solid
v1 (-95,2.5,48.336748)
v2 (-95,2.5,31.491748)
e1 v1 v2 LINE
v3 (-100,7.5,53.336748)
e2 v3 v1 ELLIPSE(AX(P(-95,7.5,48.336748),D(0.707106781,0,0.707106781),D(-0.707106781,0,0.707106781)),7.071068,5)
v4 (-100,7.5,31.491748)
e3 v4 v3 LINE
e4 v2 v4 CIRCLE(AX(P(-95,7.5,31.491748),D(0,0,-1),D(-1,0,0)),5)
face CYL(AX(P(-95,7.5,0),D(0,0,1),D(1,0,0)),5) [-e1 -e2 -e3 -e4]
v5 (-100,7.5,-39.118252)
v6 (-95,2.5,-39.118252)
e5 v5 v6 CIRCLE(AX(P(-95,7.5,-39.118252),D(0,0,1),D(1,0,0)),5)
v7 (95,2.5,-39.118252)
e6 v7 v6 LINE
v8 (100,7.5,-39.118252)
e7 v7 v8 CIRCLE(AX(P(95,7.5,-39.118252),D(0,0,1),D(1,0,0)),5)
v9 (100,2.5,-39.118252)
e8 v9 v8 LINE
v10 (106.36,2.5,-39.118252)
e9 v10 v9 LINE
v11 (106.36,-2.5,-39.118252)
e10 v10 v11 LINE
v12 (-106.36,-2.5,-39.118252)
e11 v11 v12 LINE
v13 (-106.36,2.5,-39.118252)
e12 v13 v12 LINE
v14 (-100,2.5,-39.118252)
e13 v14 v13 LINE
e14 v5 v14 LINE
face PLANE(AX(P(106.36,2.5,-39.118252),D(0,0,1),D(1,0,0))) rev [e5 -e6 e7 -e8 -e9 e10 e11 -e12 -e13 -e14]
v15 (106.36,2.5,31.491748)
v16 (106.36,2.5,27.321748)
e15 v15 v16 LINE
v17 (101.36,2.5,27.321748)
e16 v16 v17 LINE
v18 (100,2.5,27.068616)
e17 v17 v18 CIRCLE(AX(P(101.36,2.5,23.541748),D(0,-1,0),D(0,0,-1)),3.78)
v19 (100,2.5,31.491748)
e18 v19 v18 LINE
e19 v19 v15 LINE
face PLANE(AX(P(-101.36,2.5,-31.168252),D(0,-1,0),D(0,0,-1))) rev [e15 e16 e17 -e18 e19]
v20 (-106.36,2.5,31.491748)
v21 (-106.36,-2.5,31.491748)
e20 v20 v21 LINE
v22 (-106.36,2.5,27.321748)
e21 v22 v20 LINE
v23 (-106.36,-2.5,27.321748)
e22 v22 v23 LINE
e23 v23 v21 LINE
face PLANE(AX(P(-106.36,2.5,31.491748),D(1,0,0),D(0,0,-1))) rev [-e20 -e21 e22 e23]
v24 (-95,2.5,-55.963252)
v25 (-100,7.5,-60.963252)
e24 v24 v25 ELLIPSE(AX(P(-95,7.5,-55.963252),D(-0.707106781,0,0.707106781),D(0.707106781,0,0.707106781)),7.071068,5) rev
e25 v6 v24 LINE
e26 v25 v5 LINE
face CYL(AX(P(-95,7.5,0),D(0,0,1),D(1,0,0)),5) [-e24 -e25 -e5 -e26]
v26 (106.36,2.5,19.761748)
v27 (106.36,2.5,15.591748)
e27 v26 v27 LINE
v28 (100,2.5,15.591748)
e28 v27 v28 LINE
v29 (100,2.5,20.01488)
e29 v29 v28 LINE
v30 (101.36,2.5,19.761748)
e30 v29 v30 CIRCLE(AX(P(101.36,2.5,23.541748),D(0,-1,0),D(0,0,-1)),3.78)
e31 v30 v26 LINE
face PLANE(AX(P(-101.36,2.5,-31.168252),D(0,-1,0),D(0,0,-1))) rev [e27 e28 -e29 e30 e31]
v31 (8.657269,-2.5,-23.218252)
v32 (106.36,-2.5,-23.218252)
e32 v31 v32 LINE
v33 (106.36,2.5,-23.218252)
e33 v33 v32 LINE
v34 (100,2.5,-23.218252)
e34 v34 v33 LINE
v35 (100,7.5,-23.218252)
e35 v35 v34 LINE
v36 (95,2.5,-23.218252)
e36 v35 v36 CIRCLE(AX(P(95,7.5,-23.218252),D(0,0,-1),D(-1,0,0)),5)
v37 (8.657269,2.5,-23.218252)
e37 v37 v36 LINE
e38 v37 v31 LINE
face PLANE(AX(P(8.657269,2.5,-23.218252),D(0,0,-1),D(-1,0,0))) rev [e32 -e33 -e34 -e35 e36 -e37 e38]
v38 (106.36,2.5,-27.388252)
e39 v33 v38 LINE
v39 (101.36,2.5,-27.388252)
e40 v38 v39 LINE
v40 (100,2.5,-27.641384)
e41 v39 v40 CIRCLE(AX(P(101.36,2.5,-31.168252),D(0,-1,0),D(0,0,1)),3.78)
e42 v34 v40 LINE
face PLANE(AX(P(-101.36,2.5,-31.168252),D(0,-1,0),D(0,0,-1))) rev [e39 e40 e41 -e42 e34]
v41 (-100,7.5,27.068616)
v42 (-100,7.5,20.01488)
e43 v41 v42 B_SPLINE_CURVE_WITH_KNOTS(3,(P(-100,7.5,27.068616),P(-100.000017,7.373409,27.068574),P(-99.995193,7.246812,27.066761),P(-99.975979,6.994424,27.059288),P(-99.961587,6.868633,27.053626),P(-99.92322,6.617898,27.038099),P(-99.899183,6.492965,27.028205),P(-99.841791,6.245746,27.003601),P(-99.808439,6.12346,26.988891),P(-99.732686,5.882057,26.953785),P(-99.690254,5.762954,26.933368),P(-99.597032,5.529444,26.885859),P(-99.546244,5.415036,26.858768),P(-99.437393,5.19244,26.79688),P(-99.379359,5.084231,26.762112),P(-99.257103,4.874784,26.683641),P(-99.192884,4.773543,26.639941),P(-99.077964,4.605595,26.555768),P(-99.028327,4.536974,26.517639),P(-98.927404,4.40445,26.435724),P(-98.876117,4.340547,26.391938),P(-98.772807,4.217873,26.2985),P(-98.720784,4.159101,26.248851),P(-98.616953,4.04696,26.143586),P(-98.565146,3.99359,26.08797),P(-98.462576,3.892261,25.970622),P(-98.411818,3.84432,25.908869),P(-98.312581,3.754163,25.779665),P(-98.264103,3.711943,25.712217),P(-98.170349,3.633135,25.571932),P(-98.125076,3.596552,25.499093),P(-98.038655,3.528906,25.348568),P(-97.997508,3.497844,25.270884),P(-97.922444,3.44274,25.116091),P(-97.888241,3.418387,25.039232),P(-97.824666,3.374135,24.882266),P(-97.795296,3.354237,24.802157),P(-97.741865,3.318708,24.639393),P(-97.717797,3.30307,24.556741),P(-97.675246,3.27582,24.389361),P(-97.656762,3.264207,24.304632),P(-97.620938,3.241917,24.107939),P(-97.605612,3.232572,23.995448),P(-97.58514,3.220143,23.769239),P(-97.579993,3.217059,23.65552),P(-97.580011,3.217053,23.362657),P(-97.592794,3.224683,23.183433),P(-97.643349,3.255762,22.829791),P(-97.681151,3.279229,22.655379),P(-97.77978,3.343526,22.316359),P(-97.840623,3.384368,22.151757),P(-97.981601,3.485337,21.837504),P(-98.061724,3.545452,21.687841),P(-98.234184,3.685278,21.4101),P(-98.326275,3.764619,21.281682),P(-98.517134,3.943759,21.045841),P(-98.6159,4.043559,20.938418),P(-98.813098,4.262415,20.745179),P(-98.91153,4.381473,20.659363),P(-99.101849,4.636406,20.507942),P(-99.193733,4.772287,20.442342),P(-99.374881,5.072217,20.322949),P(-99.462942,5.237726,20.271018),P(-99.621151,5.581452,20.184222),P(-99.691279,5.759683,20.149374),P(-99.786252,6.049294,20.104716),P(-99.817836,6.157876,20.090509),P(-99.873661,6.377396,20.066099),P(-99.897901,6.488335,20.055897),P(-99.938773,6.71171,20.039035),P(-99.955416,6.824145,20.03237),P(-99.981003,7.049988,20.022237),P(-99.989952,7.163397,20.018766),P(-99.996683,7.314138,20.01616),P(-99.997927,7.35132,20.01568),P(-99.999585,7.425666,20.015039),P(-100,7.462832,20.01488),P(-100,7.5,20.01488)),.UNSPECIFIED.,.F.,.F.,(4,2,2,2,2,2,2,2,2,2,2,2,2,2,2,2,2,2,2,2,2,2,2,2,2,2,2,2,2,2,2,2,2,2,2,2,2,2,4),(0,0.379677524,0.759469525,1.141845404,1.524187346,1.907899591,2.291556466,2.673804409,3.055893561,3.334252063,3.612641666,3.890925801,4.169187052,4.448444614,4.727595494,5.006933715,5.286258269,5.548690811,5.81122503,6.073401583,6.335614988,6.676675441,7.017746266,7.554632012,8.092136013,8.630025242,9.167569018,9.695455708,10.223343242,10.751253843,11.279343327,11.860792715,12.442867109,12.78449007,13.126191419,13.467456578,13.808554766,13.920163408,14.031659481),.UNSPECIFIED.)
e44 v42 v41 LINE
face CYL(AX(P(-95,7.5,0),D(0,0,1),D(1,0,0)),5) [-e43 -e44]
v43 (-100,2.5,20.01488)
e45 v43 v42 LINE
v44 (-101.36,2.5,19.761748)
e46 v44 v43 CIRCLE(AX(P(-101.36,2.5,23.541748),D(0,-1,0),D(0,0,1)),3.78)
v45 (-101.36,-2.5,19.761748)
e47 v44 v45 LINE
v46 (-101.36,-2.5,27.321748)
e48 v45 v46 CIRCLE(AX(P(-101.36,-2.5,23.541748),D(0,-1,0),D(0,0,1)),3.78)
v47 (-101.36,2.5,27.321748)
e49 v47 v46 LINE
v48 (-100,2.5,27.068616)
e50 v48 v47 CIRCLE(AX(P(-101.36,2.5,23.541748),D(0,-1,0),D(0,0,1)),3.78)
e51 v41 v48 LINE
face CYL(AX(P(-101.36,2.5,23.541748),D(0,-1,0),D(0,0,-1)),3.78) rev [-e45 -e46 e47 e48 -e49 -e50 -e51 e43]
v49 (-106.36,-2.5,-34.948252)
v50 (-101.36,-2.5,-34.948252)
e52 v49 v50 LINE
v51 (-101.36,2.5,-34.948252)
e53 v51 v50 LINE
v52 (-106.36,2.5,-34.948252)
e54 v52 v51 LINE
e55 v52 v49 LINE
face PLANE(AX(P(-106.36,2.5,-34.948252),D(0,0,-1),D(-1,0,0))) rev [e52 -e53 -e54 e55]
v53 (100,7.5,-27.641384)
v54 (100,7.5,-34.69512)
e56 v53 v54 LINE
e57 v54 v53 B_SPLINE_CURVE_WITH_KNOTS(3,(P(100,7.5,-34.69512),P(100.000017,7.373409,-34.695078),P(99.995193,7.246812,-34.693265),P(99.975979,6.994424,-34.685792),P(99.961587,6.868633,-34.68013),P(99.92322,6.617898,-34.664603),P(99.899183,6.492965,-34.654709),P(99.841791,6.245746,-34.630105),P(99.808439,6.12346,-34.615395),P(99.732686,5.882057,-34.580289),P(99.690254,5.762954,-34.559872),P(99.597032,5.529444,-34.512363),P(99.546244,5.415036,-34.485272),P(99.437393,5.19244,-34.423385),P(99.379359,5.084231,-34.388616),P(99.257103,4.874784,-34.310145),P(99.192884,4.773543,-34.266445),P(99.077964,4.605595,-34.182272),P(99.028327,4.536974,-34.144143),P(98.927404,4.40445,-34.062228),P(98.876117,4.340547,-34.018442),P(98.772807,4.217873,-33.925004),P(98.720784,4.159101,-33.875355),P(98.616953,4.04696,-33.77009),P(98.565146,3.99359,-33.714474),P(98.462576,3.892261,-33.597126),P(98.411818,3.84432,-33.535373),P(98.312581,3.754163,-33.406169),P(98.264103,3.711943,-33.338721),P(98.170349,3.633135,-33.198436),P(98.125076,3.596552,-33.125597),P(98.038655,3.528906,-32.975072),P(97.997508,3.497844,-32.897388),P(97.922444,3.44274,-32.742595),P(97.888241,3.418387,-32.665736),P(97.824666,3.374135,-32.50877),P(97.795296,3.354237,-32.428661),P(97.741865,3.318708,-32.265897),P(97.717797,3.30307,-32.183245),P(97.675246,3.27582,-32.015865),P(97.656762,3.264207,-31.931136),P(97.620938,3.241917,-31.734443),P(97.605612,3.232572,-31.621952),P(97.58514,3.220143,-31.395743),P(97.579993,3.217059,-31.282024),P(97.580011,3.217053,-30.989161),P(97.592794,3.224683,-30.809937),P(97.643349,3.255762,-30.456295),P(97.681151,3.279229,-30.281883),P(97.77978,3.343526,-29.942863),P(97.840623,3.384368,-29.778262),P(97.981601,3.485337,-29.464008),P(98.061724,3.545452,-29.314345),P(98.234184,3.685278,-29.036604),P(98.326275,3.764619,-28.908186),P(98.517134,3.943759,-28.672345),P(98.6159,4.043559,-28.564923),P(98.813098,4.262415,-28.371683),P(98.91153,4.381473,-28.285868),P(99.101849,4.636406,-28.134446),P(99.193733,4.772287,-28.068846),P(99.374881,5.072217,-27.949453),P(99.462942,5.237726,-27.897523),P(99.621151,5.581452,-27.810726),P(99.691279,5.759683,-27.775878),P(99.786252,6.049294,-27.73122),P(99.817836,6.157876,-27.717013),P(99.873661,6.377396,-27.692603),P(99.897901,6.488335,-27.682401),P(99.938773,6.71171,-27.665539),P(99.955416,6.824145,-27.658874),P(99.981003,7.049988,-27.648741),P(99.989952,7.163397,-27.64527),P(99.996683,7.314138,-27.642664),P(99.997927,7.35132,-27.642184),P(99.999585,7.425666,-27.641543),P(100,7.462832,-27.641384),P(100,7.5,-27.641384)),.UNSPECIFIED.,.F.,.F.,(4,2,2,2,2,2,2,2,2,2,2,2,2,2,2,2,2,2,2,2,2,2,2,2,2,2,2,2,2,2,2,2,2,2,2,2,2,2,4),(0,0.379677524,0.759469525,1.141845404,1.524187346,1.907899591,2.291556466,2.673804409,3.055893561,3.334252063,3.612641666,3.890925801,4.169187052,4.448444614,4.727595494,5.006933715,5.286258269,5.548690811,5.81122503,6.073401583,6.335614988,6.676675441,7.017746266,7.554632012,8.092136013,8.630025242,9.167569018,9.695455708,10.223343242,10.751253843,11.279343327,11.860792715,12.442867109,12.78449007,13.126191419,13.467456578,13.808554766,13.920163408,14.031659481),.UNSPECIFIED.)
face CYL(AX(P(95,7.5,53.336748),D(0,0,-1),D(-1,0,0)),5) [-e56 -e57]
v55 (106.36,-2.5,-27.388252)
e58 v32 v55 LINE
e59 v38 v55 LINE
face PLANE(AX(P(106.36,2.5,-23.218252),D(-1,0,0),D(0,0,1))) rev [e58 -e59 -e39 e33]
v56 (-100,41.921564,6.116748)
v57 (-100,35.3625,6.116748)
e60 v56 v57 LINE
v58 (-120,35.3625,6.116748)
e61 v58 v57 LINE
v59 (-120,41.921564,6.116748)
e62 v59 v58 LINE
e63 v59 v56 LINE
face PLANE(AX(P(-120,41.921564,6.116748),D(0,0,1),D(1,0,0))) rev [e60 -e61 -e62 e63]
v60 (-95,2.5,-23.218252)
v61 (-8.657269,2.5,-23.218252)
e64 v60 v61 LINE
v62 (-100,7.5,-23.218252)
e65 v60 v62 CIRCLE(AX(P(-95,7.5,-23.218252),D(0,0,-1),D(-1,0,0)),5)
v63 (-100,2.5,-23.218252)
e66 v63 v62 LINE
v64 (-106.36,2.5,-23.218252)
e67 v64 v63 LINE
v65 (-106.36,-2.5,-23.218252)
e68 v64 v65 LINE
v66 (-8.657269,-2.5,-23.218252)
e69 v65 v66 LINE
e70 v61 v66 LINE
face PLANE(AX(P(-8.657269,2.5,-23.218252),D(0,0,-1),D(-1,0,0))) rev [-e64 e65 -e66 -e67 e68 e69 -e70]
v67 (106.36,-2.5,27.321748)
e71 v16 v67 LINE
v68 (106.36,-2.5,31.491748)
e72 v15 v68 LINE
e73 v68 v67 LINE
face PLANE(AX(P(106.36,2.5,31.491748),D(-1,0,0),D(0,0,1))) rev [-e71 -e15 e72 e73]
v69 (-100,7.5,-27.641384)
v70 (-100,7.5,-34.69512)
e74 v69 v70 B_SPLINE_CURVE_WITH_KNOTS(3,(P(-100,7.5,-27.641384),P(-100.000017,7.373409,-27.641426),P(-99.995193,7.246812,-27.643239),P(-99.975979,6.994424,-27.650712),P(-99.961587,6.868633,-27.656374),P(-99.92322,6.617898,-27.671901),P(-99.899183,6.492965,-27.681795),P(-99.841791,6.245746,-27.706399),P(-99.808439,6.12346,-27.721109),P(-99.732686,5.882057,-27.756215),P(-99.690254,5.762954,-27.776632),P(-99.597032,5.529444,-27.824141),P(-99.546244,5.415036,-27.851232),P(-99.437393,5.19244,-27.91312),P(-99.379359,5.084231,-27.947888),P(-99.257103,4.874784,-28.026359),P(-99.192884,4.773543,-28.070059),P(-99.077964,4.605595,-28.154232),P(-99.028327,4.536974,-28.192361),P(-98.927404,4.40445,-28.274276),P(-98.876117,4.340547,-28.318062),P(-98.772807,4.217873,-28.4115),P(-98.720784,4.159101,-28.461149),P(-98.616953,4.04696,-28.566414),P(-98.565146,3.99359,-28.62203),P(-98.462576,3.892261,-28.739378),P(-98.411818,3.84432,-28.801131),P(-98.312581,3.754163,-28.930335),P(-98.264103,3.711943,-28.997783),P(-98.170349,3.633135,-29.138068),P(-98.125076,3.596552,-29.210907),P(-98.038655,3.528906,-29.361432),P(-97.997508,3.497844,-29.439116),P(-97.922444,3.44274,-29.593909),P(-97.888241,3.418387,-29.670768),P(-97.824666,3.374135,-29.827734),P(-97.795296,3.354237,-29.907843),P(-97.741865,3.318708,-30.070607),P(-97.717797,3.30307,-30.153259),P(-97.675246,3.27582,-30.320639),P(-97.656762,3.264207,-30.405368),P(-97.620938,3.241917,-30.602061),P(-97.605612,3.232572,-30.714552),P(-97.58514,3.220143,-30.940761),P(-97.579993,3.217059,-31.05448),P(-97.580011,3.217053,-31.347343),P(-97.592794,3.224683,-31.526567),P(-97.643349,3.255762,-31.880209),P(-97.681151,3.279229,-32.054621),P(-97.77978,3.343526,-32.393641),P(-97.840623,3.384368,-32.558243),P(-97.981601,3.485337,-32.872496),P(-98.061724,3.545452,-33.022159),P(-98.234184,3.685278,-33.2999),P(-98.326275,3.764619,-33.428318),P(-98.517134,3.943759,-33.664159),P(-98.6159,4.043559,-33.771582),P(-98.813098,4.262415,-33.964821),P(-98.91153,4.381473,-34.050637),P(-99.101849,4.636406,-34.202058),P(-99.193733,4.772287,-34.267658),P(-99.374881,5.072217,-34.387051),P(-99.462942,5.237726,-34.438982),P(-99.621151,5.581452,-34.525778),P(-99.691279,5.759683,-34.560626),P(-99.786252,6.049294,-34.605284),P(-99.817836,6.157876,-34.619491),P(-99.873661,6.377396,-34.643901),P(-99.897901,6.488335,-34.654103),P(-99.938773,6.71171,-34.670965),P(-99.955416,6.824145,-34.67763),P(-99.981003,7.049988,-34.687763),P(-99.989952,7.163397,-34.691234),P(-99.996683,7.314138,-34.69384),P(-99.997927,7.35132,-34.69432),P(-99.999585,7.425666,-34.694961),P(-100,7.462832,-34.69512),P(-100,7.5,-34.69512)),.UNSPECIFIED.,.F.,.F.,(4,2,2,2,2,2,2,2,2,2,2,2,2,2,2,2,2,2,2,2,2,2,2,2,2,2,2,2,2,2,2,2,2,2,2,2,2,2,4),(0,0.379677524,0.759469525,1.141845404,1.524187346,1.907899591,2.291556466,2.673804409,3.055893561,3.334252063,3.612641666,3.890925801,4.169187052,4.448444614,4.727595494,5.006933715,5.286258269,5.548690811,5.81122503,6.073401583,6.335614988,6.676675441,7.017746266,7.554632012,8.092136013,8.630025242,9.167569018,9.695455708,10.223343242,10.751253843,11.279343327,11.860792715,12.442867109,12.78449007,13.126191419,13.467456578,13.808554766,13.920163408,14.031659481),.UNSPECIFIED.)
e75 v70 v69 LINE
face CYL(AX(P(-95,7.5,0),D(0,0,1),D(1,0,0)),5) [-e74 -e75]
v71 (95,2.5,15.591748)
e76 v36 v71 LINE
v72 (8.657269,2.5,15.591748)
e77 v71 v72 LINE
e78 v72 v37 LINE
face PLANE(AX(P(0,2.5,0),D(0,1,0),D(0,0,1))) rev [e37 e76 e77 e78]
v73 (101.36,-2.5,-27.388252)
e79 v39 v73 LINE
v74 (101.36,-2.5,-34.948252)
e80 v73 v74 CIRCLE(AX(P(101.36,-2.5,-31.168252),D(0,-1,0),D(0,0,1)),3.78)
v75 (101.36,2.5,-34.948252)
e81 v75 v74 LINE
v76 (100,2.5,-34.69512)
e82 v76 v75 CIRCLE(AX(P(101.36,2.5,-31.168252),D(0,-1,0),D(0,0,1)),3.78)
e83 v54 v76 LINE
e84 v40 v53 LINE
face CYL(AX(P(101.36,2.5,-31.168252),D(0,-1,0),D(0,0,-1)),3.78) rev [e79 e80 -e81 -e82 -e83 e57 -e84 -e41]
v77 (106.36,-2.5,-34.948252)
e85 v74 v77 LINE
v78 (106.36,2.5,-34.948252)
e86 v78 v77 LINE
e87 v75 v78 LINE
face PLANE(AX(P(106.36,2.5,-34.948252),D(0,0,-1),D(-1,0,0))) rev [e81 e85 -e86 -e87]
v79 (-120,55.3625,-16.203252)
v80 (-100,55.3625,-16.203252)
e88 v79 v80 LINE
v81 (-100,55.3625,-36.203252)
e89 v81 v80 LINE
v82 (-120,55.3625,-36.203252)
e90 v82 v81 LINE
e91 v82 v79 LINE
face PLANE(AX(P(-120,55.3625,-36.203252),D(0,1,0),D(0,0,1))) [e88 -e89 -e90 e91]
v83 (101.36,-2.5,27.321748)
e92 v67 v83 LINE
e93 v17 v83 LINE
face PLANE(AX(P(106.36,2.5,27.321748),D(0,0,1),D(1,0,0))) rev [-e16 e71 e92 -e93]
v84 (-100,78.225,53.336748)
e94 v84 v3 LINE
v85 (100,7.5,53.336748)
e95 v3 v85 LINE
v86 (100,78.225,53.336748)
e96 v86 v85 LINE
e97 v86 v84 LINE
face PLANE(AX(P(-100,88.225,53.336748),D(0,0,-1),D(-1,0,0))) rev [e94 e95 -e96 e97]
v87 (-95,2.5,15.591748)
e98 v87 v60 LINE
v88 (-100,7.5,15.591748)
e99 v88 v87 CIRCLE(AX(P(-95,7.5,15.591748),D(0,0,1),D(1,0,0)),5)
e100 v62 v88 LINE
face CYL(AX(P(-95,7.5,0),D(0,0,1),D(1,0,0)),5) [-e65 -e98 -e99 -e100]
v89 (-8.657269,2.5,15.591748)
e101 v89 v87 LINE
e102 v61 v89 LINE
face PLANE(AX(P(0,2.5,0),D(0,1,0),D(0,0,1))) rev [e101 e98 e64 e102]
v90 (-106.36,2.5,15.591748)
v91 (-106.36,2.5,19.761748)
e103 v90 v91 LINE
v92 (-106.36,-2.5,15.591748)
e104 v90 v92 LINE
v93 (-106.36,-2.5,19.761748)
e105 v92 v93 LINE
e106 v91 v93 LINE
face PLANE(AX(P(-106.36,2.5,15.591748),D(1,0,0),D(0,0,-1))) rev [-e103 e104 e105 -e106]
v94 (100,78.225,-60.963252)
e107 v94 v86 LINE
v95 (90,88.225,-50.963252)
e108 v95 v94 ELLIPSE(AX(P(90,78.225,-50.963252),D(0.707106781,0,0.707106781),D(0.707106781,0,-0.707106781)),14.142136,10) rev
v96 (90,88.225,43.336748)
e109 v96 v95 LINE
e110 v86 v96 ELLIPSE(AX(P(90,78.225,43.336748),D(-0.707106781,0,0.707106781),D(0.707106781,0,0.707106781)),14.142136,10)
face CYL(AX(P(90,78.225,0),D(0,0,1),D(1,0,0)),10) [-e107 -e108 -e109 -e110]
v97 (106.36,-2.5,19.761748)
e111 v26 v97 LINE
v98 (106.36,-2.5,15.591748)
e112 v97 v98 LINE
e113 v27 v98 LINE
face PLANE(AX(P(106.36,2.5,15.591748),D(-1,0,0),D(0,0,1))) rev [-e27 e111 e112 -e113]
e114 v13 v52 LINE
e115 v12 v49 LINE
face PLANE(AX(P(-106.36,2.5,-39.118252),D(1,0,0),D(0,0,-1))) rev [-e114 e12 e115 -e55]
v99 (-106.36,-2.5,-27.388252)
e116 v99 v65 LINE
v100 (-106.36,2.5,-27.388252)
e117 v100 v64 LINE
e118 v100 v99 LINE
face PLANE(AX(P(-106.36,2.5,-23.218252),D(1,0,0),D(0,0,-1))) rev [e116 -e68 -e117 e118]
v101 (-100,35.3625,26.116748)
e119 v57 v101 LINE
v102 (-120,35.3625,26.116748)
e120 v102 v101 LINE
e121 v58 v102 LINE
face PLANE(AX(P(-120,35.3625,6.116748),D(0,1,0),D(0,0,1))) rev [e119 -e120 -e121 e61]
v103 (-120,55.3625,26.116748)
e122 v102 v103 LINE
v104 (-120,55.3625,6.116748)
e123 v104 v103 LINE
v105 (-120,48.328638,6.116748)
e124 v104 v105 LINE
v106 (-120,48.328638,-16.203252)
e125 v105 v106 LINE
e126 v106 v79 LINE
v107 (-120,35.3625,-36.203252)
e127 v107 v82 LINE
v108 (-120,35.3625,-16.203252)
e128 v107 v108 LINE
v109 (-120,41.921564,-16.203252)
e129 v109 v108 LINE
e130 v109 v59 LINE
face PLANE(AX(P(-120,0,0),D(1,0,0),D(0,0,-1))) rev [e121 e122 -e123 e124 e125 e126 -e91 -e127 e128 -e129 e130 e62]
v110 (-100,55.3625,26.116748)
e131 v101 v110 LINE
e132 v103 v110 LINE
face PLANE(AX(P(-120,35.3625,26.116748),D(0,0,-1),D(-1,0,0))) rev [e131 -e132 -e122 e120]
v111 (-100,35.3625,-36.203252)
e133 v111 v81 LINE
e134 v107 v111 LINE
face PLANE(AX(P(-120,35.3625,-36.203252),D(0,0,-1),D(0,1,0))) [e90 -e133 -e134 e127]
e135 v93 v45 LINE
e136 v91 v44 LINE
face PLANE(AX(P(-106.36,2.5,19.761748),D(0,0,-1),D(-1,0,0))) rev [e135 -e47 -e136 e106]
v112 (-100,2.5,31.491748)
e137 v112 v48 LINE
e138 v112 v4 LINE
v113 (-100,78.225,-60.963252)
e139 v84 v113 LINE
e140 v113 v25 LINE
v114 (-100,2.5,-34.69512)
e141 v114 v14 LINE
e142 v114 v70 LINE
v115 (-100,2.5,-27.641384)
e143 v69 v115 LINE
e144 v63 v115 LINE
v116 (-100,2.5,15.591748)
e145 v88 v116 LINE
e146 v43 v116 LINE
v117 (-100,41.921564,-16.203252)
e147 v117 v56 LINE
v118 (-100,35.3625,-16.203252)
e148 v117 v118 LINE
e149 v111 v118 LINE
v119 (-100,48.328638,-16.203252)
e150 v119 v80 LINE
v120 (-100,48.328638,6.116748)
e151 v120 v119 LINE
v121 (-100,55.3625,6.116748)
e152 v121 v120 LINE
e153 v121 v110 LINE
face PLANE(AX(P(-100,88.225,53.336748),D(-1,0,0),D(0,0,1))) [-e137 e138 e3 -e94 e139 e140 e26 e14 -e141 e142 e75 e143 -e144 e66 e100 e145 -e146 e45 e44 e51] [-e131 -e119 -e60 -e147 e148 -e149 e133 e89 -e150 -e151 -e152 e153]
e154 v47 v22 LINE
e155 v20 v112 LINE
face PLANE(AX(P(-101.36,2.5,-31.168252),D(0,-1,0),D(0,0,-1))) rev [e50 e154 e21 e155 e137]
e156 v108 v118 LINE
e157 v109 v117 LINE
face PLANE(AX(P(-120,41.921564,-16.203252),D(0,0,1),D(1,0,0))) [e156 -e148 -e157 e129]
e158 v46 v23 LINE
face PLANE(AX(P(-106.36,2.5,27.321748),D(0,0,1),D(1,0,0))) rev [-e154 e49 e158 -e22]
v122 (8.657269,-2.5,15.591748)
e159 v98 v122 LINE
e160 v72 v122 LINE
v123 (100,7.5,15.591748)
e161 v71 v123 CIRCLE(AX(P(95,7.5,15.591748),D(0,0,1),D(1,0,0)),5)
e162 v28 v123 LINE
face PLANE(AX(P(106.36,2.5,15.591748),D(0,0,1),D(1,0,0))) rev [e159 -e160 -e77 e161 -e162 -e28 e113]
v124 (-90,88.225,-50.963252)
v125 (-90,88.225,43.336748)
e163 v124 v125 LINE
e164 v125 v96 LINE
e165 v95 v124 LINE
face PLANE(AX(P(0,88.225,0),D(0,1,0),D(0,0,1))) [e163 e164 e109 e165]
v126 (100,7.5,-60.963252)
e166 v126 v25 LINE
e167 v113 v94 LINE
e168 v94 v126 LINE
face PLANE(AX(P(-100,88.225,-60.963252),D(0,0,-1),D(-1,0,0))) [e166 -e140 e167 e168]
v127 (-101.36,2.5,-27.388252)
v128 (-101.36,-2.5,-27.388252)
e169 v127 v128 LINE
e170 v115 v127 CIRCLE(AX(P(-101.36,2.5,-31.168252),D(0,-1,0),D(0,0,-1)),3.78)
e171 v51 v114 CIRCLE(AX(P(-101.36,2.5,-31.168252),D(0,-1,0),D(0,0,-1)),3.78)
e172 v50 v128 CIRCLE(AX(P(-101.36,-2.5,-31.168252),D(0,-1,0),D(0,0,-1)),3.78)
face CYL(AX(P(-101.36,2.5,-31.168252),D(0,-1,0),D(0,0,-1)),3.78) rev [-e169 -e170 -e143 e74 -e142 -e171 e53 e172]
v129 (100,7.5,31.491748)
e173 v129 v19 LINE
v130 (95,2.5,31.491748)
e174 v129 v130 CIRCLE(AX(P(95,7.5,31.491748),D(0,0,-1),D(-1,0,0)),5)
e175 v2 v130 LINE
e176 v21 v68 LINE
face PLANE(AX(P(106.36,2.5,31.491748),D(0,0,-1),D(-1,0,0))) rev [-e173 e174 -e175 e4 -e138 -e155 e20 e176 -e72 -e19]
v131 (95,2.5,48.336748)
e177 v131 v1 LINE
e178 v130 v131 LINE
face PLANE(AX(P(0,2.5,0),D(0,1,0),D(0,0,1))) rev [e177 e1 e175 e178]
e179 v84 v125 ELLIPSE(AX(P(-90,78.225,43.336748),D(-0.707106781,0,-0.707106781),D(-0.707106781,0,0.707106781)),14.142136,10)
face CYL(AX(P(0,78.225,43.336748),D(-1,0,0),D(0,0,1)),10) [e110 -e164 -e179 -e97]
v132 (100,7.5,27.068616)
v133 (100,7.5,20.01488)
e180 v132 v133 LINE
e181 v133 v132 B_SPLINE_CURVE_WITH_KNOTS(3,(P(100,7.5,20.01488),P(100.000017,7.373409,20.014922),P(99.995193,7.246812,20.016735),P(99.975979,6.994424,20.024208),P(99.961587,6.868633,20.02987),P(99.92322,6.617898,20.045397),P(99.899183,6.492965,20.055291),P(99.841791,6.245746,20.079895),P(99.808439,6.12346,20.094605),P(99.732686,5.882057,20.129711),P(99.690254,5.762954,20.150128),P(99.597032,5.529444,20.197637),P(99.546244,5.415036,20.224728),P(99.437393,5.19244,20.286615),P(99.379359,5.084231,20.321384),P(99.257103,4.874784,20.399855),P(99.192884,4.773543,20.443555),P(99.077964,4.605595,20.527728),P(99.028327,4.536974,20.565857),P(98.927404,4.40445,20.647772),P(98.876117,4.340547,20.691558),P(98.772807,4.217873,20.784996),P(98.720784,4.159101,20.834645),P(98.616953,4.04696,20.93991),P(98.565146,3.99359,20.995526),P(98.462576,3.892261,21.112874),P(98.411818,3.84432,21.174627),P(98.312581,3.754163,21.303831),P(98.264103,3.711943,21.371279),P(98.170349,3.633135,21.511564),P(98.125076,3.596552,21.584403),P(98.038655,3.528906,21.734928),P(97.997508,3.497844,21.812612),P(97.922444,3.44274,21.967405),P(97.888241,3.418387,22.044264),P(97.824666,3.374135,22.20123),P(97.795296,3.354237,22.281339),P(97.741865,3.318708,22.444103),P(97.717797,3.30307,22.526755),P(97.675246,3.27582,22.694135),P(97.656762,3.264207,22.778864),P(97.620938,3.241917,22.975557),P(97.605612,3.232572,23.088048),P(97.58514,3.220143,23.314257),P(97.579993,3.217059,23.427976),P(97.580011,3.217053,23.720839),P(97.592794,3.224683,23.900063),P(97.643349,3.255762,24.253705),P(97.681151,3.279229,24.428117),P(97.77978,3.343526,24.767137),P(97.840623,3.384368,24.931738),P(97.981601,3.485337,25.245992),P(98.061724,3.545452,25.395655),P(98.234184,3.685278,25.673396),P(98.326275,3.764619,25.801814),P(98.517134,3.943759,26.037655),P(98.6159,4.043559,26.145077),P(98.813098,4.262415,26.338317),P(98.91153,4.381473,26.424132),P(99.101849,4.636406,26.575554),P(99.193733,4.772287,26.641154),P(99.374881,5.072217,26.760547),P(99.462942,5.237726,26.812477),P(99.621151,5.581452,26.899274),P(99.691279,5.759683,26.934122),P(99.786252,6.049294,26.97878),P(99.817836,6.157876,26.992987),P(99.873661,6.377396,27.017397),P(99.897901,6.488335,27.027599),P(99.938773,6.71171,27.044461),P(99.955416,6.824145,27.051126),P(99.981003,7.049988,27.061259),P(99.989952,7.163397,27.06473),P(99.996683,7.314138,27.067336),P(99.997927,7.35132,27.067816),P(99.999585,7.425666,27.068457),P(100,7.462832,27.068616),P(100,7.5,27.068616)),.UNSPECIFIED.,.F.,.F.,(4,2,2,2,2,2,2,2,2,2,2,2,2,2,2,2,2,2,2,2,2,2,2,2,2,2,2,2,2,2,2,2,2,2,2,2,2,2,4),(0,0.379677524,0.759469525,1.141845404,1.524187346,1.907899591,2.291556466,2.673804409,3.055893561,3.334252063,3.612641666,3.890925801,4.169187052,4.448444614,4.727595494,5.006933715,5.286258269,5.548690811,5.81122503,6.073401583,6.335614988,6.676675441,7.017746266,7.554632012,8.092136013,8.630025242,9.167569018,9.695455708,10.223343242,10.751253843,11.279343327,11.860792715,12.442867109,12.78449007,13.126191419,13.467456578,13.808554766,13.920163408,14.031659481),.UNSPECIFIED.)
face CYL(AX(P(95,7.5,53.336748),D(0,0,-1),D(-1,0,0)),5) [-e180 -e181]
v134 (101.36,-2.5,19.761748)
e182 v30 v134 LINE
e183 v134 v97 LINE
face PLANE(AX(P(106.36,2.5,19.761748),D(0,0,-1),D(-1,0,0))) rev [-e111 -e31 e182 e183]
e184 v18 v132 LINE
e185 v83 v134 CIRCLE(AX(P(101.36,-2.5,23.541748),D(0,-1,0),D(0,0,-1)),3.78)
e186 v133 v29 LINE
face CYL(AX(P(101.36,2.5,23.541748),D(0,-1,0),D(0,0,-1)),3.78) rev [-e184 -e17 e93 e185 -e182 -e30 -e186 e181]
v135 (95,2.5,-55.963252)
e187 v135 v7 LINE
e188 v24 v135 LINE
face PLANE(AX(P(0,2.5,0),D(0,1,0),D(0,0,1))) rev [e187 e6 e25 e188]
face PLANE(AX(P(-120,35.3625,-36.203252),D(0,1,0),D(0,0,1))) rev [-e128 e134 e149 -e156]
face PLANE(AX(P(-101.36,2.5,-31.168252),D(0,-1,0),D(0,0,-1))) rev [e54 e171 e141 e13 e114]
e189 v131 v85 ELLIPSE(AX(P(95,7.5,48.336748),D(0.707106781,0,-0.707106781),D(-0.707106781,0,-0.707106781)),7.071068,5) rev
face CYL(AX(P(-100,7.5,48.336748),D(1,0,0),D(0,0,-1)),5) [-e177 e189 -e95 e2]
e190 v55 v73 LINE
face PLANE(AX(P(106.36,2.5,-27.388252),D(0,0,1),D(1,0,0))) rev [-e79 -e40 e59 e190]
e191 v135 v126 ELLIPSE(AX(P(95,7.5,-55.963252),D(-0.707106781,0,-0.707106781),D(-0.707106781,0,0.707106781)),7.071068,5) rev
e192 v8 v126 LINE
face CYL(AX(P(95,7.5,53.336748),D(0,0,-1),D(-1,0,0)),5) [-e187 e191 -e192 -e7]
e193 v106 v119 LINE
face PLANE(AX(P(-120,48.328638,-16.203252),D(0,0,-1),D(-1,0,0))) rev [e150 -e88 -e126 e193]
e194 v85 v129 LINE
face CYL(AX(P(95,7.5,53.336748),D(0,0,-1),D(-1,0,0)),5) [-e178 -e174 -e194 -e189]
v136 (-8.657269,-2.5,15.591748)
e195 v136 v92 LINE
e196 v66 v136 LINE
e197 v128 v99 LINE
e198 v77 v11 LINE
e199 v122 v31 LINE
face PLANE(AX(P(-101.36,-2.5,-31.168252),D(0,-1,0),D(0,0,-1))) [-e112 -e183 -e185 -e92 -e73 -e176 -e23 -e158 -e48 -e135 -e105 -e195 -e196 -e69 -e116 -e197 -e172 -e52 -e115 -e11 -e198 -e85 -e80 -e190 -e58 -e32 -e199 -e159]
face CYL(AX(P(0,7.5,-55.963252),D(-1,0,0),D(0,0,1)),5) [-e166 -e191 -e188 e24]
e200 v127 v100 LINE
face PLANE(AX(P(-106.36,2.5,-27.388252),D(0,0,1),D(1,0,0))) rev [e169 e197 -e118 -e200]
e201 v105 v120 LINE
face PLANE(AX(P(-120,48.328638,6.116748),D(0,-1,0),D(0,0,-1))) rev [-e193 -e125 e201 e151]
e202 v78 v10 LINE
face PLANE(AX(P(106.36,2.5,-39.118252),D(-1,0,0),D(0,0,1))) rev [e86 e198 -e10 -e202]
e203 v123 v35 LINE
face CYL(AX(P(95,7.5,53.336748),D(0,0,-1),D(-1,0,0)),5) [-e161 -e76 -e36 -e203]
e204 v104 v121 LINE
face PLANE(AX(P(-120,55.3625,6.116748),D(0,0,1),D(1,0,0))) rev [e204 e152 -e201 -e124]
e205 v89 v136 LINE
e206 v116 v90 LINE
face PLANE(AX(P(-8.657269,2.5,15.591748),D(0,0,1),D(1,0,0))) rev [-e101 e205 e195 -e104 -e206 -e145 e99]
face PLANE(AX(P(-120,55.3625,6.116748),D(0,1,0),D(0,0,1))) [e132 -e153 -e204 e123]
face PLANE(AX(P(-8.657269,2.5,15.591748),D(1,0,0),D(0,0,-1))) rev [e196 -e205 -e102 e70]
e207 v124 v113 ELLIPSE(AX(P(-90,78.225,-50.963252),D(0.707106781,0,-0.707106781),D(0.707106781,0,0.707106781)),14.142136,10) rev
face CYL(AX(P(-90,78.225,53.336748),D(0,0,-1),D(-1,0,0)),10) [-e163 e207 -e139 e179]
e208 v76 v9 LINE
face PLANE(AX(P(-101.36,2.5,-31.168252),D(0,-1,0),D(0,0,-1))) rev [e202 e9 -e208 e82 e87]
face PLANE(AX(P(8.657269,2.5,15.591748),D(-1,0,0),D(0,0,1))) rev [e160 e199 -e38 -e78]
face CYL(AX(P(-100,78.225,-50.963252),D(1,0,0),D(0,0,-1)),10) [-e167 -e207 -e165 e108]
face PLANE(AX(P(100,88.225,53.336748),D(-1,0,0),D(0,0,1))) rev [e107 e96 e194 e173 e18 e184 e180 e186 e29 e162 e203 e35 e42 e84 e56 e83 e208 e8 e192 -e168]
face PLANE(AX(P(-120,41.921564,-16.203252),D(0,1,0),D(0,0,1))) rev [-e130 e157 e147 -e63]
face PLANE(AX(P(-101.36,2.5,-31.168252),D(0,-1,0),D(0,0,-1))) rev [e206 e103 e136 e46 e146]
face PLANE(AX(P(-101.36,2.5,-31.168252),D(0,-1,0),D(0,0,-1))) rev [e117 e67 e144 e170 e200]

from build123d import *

# Parameters (mm, degrees)
BOSS_EXTRUDE1_DEPTH = 2.5
SKETCH2_W           = 200
SKETCH2_H           = 114.3
BOSS_EXTRUDE3_DEPTH = 85.725
BOSS_EXTRUDE5_DEPTH = 20
FILLET1_R           = 5
FILLET2_R           = 10


with BuildPart() as part:
    # Sketch1 → Boss-Extrude1 (new, symmetric)
    with BuildSketch(Plane(origin=(0, 0, 0), x_dir=(1, 0, 0), z_dir=(0, 1, 0))):
        with BuildLine():
            Line((106.36, 39.118252024), (-106.36, 39.118252024))
            Line((-106.36, 39.118252024), (-106.36, 34.948252024))
            Line((-106.36, 34.948252024), (-101.36, 34.948252024))
            ThreePointArc((-101.36, 34.948252024), (-97.58, 31.168252024), (-101.36, 27.388252024))
            Line((-101.36, 27.388252024), (-106.36, 27.388252024))
            Line((-106.36, 27.388252024), (-106.36, 23.218252024))
            Line((-106.36, 23.218252024), (-8.657269076, 23.218252024))
            Line((-8.657269076, 23.218252024), (-8.657269076, -15.591747976))
            Line((-8.657269076, -15.591747976), (-106.36, -15.591747976))
            Line((-106.36, -15.591747976), (-106.36, -19.761747976))
            Line((-106.36, -19.761747976), (-101.36, -19.761747976))
            ThreePointArc((-101.36, -19.761747976), (-97.58, -23.541747976), (-101.36, -27.321747976))
            Line((-101.36, -27.321747976), (-106.36, -27.321747976))
            Line((-106.36, -27.321747976), (-106.36, -31.491747976))
            Line((-106.36, -31.491747976), (106.36, -31.491747976))
            Line((106.36, -31.491747976), (106.36, -27.321747976))
            Line((106.36, -27.321747976), (101.36, -27.321747976))
            ThreePointArc((101.36, -27.321747976), (97.58, -23.541747976), (101.36, -19.761747976))
            Line((101.36, -19.761747976), (106.36, -19.761747976))
            Line((106.36, -19.761747976), (106.36, -15.591747976))
            Line((106.36, -15.591747976), (8.657269076, -15.591747976))
            Line((8.657269076, -15.591747976), (8.657269076, 23.218252024))
            Line((8.657269076, 23.218252024), (106.36, 23.218252024))
            Line((106.36, 23.218252024), (106.36, 27.388252024))
            Line((106.36, 27.388252024), (101.36, 27.388252024))
            ThreePointArc((101.36, 27.388252024), (97.58, 31.168252024), (101.36, 34.948252024))
            Line((101.36, 34.948252024), (106.36, 34.948252024))
            Line((106.36, 34.948252024), (106.36, 39.118252024))
        make_face()
    extrude(amount=BOSS_EXTRUDE1_DEPTH, both=True)

    # Sketch2 → Boss-Extrude3 (add)
    with BuildSketch(Plane(origin=(0, 2.5, 0), x_dir=(1, 0, 0), z_dir=(0, 1, 0))):
        with Locations((0, 3.813252024)):
            Rectangle(SKETCH2_W, SKETCH2_H)
    extrude(amount=BOSS_EXTRUDE3_DEPTH)

    # Sketch3 → Boss-Extrude5 (add)
    with BuildSketch(Plane.ZY.offset(100)):
        Polygon((-16.203252024, 41.921564451), (6.116747976, 41.921564451), (6.116747976, 35.3625), (26.116747976, 35.3625), (26.116747976, 55.3625), (6.116747976, 55.3625), (6.116747976, 48.328638309), (-16.203252024, 48.328638309), (-16.203252024, 55.3625), (-36.203252024, 55.3625), (-36.203252024, 35.3625), (-16.203252024, 35.3625), align=None)
    extrude(amount=BOSS_EXTRUDE5_DEPTH)

    # Fillet1
    # the kernel refuses this fillet: 5 mm, written as the material it takes off along each edge
    with BuildSketch(Plane(origin=(-100, 2.5, 7.514879677), x_dir=(0, 1, 0), z_dir=(0, 0, 1))) as fillet1_piece_1_section:
        with BuildLine():
            CenterArc((FILLET1_R, -FILLET1_R), FILLET1_R, 90, 90)
            Line((0, -FILLET1_R), (0, 0))
            Line((0, 0), (FILLET1_R, 0))
        make_face()
    fillet1_piece_1 = extrude(amount=32.053736598, mode=Mode.PRIVATE)
    fillet1_piece_1 = split(fillet1_piece_1, bisect_by=Plane(origin=(-98.883160305, 3.616839695, 15.591747976), z_dir=(0, 0, -1)), keep=Keep.TOP, mode=Mode.PRIVATE)
    add(fillet1_piece_1, mode=Mode.SUBTRACT)
    with BuildSketch(Plane(origin=(-100, 2.5, 7.514879677), x_dir=(0, 1, 0), z_dir=(0, 0, 1))) as fillet1_piece_2_section:
        with BuildLine():
            CenterArc((FILLET1_R, -FILLET1_R), FILLET1_R, 90, 90)
            Line((0, -FILLET1_R), (0, 0))
            Line((0, 0), (FILLET1_R, 0))
        make_face()
    fillet1_piece_2 = extrude(amount=32.053736598, mode=Mode.PRIVATE)
    fillet1_piece_2 = split(fillet1_piece_2, bisect_by=Plane(origin=(-98.883160305, 3.616839695, 31.491747976), z_dir=(0, 0, 1)), keep=Keep.TOP, mode=Mode.PRIVATE)
    add(fillet1_piece_2, mode=Mode.SUBTRACT)
    with BuildSketch(Plane(origin=(-100, 2.5, 7.514879677), x_dir=(0, 1, 0), z_dir=(0, 0, 1))) as fillet1_piece_3_section:
        with BuildLine():
            CenterArc((FILLET1_R, -FILLET1_R), FILLET1_R, 90, 90)
            Line((0, -FILLET1_R), (0, 0))
            Line((0, 0), (FILLET1_R, 0))
        make_face()
    fillet1_piece_3 = extrude(amount=32.053736598, mode=Mode.PRIVATE)
    fillet1_piece_3 = fillet1_piece_3 & Plane(origin=(-101.36, 3.831804997, 23.541747976), x_dir=(0, 0, -1), z_dir=(0, 1, 0)) * Cylinder(3.78, 85, mode=Mode.PRIVATE)
    add(fillet1_piece_3, mode=Mode.SUBTRACT)
    with BuildSketch(Plane(origin=(-100, 2.5, 31.491747976), x_dir=(0, 1, 0), z_dir=(0, 0, 1)), Plane(origin=(100, 2.5, 65.836747976), x_dir=(0, 1, 0), z_dir=(0, 0, -1))) as fillet1_piece_4:
        with BuildLine():
            CenterArc((FILLET1_R, -FILLET1_R), FILLET1_R, 90, 90)
            Line((0, -FILLET1_R), (0, 0))
            Line((0, 0), (FILLET1_R, 0))
        make_face()
    extrude(amount=34.345, mode=Mode.SUBTRACT)
    with BuildSketch(Plane(origin=(-100, 2.5, 18.991747976), x_dir=(0, 1, 0), z_dir=(0, 0, 1))) as fillet1_piece_5_section:
        with BuildLine():
            CenterArc((FILLET1_R, -FILLET1_R), FILLET1_R, 90, 90)
            Line((0, -FILLET1_R), (0, 0))
            Line((0, 0), (FILLET1_R, 0))
        make_face()
    fillet1_piece_5 = extrude(amount=46.845, mode=Mode.PRIVATE)
    fillet1_piece_5 = fillet1_piece_5 & Plane(origin=(-101.36, 3.831804998, 23.541747976), x_dir=(0, 0, -1), z_dir=(0, 1, 0)) * Cylinder(3.78, 114, mode=Mode.PRIVATE)
    add(fillet1_piece_5, mode=Mode.SUBTRACT)
    with BuildSketch(Plane(origin=(-100, 2.5, -73.463252024), x_dir=(1, 0, 0), z_dir=(0, 0, 1)), Plane(origin=(100, 2.5, -39.118252024), x_dir=(-1, 0, 0), z_dir=(0, 0, -1))) as fillet1_piece_6:
        with BuildLine():
            CenterArc((FILLET1_R, FILLET1_R), FILLET1_R, 180, 90)
            Line((0, FILLET1_R), (0, 0))
            Line((0, 0), (FILLET1_R, 0))
        make_face()
    extrude(amount=34.345, mode=Mode.SUBTRACT)
    with BuildSketch(Plane(origin=(-100, 2.5, -73.463252024), x_dir=(1, 0, 0), z_dir=(0, 0, 1))) as fillet1_piece_7_section:
        with BuildLine():
            CenterArc((FILLET1_R, FILLET1_R), FILLET1_R, 180, 90)
            Line((0, FILLET1_R), (0, 0))
            Line((0, 0), (FILLET1_R, 0))
        make_face()
    fillet1_piece_7 = extrude(amount=46.845, mode=Mode.PRIVATE)
    fillet1_piece_7 = fillet1_piece_7 & Plane(origin=(-101.36, 3.831808232, -31.168252024), x_dir=(0, 0, -1), z_dir=(0, 1, 0)) * Cylinder(3.78, 114, mode=Mode.PRIVATE)
    add(fillet1_piece_7, mode=Mode.SUBTRACT)
    with BuildSketch(Plane(origin=(112.5, 2.5, -60.963252024), x_dir=(0, 0, 1), z_dir=(-1, 0, 0)), Plane(origin=(-112.5, 2.5, 53.336747976), x_dir=(0, 0, -1), z_dir=(1, 0, 0))) as fillet1_piece_8:
        with BuildLine():
            CenterArc((FILLET1_R, FILLET1_R), FILLET1_R, 180, 90)
            Line((0, FILLET1_R), (0, 0))
            Line((0, 0), (FILLET1_R, 0))
        make_face()
    extrude(amount=225, mode=Mode.SUBTRACT)
    with BuildSketch(Plane(origin=(-100, 2.5, -47.195120323), x_dir=(0, 1, 0), z_dir=(0, 0, 1))) as fillet1_piece_9_section:
        with BuildLine():
            CenterArc((FILLET1_R, -FILLET1_R), FILLET1_R, 90, 90)
            Line((0, -FILLET1_R), (0, 0))
            Line((0, 0), (FILLET1_R, 0))
        make_face()
    fillet1_piece_9 = extrude(amount=32.053736598, mode=Mode.PRIVATE)
    fillet1_piece_9 = split(fillet1_piece_9, bisect_by=Plane(origin=(-98.883160305, 3.616839695, -39.118252024), z_dir=(0, 0, -1)), keep=Keep.TOP, mode=Mode.PRIVATE)
    add(fillet1_piece_9, mode=Mode.SUBTRACT)
    with BuildSketch(Plane(origin=(-100, 2.5, -47.195120323), x_dir=(0, 1, 0), z_dir=(0, 0, 1))) as fillet1_piece_10_section:
        with BuildLine():
            CenterArc((FILLET1_R, -FILLET1_R), FILLET1_R, 90, 90)
            Line((0, -FILLET1_R), (0, 0))
            Line((0, 0), (FILLET1_R, 0))
        make_face()
    fillet1_piece_10 = extrude(amount=32.053736598, mode=Mode.PRIVATE)
    fillet1_piece_10 = split(fillet1_piece_10, bisect_by=Plane(origin=(-98.883160305, 3.616839695, -23.218252024), z_dir=(0, 0, 1)), keep=Keep.TOP, mode=Mode.PRIVATE)
    add(fillet1_piece_10, mode=Mode.SUBTRACT)
    with BuildSketch(Plane(origin=(-100, 2.5, -47.195120323), x_dir=(0, 1, 0), z_dir=(0, 0, 1))) as fillet1_piece_11_section:
        with BuildLine():
            CenterArc((FILLET1_R, -FILLET1_R), FILLET1_R, 90, 90)
            Line((0, -FILLET1_R), (0, 0))
            Line((0, 0), (FILLET1_R, 0))
        make_face()
    fillet1_piece_11 = extrude(amount=32.053736598, mode=Mode.PRIVATE)
    fillet1_piece_11 = fillet1_piece_11 & Plane(origin=(-101.36, 3.831804998, -31.168252024), x_dir=(0, 0, -1), z_dir=(0, 1, 0)) * Cylinder(3.78, 85, mode=Mode.PRIVATE)
    add(fillet1_piece_11, mode=Mode.SUBTRACT)
    with BuildSketch(Plane(origin=(-100, 2.5, -23.218252024), x_dir=(0, 1, 0), z_dir=(0, 0, 1)), Plane(origin=(100, 2.5, 15.591747976), x_dir=(0, 1, 0), z_dir=(0, 0, -1))) as fillet1_piece_12:
        with BuildLine():
            CenterArc((FILLET1_R, -FILLET1_R), FILLET1_R, 90, 90)
            Line((0, -FILLET1_R), (0, 0))
            Line((0, 0), (FILLET1_R, 0))
        make_face()
    extrude(amount=38.81, mode=Mode.SUBTRACT)
    with BuildSketch(Plane(origin=(-100, 2.5, -35.718252024), x_dir=(0, 1, 0), z_dir=(0, 0, 1))) as fillet1_piece_13_section:
        with BuildLine():
            CenterArc((FILLET1_R, -FILLET1_R), FILLET1_R, 90, 90)
            Line((0, -FILLET1_R), (0, 0))
            Line((0, 0), (FILLET1_R, 0))
        make_face()
    fillet1_piece_13 = extrude(amount=63.81, mode=Mode.PRIVATE)
    fillet1_piece_13 = fillet1_piece_13 & Plane(origin=(-101.36, 3.831804998, -31.168252024), x_dir=(0, 0, -1), z_dir=(0, 1, 0)) * Cylinder(3.78, 148, mode=Mode.PRIVATE)
    add(fillet1_piece_13, mode=Mode.SUBTRACT)
    with BuildSketch(Plane(origin=(-100, 2.5, -35.718252024), x_dir=(0, 1, 0), z_dir=(0, 0, 1))) as fillet1_piece_14_section:
        with BuildLine():
            CenterArc((FILLET1_R, -FILLET1_R), FILLET1_R, 90, 90)
            Line((0, -FILLET1_R), (0, 0))
            Line((0, 0), (FILLET1_R, 0))
        make_face()
    fillet1_piece_14 = extrude(amount=63.81, mode=Mode.PRIVATE)
    fillet1_piece_14 = fillet1_piece_14 & Plane(origin=(-101.36, 3.831804998, 23.541747976), x_dir=(0, 0, -1), z_dir=(0, 1, 0)) * Cylinder(3.78, 148, mode=Mode.PRIVATE)
    add(fillet1_piece_14, mode=Mode.SUBTRACT)
    with BuildSketch(Plane(origin=(100, 2.5, 65.836747976), x_dir=(0, 1, 0), z_dir=(0, 0, -1))) as fillet1_piece_15_section:
        with BuildLine():
            CenterArc((FILLET1_R, -FILLET1_R), FILLET1_R, 90, 90)
            Line((0, -FILLET1_R), (0, 0))
            Line((0, 0), (FILLET1_R, 0))
        make_face()
    fillet1_piece_15 = extrude(amount=46.845, mode=Mode.PRIVATE)
    fillet1_piece_15 = fillet1_piece_15 & Plane(origin=(101.36, 3.831804997, 23.541747976), x_dir=(0, 0, 1), z_dir=(0, 1, 0)) * Cylinder(3.78, 114, mode=Mode.PRIVATE)
    add(fillet1_piece_15, mode=Mode.SUBTRACT)
    with BuildSketch(Plane(origin=(100, 2.5, 39.568616275), x_dir=(0, 1, 0), z_dir=(0, 0, -1))) as fillet1_piece_16_section:
        with BuildLine():
            CenterArc((FILLET1_R, -FILLET1_R), FILLET1_R, 90, 90)
            Line((0, -FILLET1_R), (0, 0))
            Line((0, 0), (FILLET1_R, 0))
        make_face()
    fillet1_piece_16 = extrude(amount=32.053736598, mode=Mode.PRIVATE)
    fillet1_piece_16 = split(fillet1_piece_16, bisect_by=Plane(origin=(98.883160305, 3.616839695, 31.491747976), z_dir=(0, 0, 1)), keep=Keep.TOP, mode=Mode.PRIVATE)
    add(fillet1_piece_16, mode=Mode.SUBTRACT)
    with BuildSketch(Plane(origin=(100, 2.5, 39.568616275), x_dir=(0, 1, 0), z_dir=(0, 0, -1))) as fillet1_piece_17_section:
        with BuildLine():
            CenterArc((FILLET1_R, -FILLET1_R), FILLET1_R, 90, 90)
            Line((0, -FILLET1_R), (0, 0))
            Line((0, 0), (FILLET1_R, 0))
        make_face()
    fillet1_piece_17 = extrude(amount=32.053736598, mode=Mode.PRIVATE)
    fillet1_piece_17 = split(fillet1_piece_17, bisect_by=Plane(origin=(98.883160305, 3.616839695, 15.591747976), z_dir=(0, 0, -1)), keep=Keep.TOP, mode=Mode.PRIVATE)
    add(fillet1_piece_17, mode=Mode.SUBTRACT)
    with BuildSketch(Plane(origin=(100, 2.5, 39.568616275), x_dir=(0, 1, 0), z_dir=(0, 0, -1))) as fillet1_piece_18_section:
        with BuildLine():
            CenterArc((FILLET1_R, -FILLET1_R), FILLET1_R, 90, 90)
            Line((0, -FILLET1_R), (0, 0))
            Line((0, 0), (FILLET1_R, 0))
        make_face()
    fillet1_piece_18 = extrude(amount=32.053736598, mode=Mode.PRIVATE)
    fillet1_piece_18 = fillet1_piece_18 & Plane(origin=(101.36, 3.831804998, 23.541747976), x_dir=(0, 0, 1), z_dir=(0, 1, 0)) * Cylinder(3.78, 85, mode=Mode.PRIVATE)
    add(fillet1_piece_18, mode=Mode.SUBTRACT)
    with BuildSketch(Plane(origin=(100, 2.5, 28.091747976), x_dir=(0, 1, 0), z_dir=(0, 0, -1))) as fillet1_piece_19_section:
        with BuildLine():
            CenterArc((FILLET1_R, -FILLET1_R), FILLET1_R, 90, 90)
            Line((0, -FILLET1_R), (0, 0))
            Line((0, 0), (FILLET1_R, 0))
        make_face()
    fillet1_piece_19 = extrude(amount=63.81, mode=Mode.PRIVATE)
    fillet1_piece_19 = fillet1_piece_19 & Plane(origin=(101.36, 3.831804998, 23.541747976), x_dir=(0, 0, 1), z_dir=(0, 1, 0)) * Cylinder(3.78, 148, mode=Mode.PRIVATE)
    add(fillet1_piece_19, mode=Mode.SUBTRACT)
    with BuildSketch(Plane(origin=(100, 2.5, 28.091747976), x_dir=(0, 1, 0), z_dir=(0, 0, -1))) as fillet1_piece_20_section:
        with BuildLine():
            CenterArc((FILLET1_R, -FILLET1_R), FILLET1_R, 90, 90)
            Line((0, -FILLET1_R), (0, 0))
            Line((0, 0), (FILLET1_R, 0))
        make_face()
    fillet1_piece_20 = extrude(amount=63.81, mode=Mode.PRIVATE)
    fillet1_piece_20 = fillet1_piece_20 & Plane(origin=(101.36, 3.831804999, -31.168252024), x_dir=(0, 0, 1), z_dir=(0, 1, 0)) * Cylinder(3.78, 148, mode=Mode.PRIVATE)
    add(fillet1_piece_20, mode=Mode.SUBTRACT)
    with BuildSketch(Plane(origin=(100, 2.5, -15.141383725), x_dir=(0, 1, 0), z_dir=(0, 0, -1))) as fillet1_piece_21_section:
        with BuildLine():
            CenterArc((FILLET1_R, -FILLET1_R), FILLET1_R, 90, 90)
            Line((0, -FILLET1_R), (0, 0))
            Line((0, 0), (FILLET1_R, 0))
        make_face()
    fillet1_piece_21 = extrude(amount=32.053736598, mode=Mode.PRIVATE)
    fillet1_piece_21 = split(fillet1_piece_21, bisect_by=Plane(origin=(98.883160305, 3.616839695, -23.218252024), z_dir=(0, 0, 1)), keep=Keep.TOP, mode=Mode.PRIVATE)
    add(fillet1_piece_21, mode=Mode.SUBTRACT)
    with BuildSketch(Plane(origin=(100, 2.5, -15.141383725), x_dir=(0, 1, 0), z_dir=(0, 0, -1))) as fillet1_piece_22_section:
        with BuildLine():
            CenterArc((FILLET1_R, -FILLET1_R), FILLET1_R, 90, 90)
            Line((0, -FILLET1_R), (0, 0))
            Line((0, 0), (FILLET1_R, 0))
        make_face()
    fillet1_piece_22 = extrude(amount=32.053736598, mode=Mode.PRIVATE)
    fillet1_piece_22 = split(fillet1_piece_22, bisect_by=Plane(origin=(98.883160305, 3.616839695, -39.118252024), z_dir=(0, 0, -1)), keep=Keep.TOP, mode=Mode.PRIVATE)
    add(fillet1_piece_22, mode=Mode.SUBTRACT)
    with BuildSketch(Plane(origin=(100, 2.5, -15.141383725), x_dir=(0, 1, 0), z_dir=(0, 0, -1))) as fillet1_piece_23_section:
        with BuildLine():
            CenterArc((FILLET1_R, -FILLET1_R), FILLET1_R, 90, 90)
            Line((0, -FILLET1_R), (0, 0))
            Line((0, 0), (FILLET1_R, 0))
        make_face()
    fillet1_piece_23 = extrude(amount=32.053736598, mode=Mode.PRIVATE)
    fillet1_piece_23 = fillet1_piece_23 & Plane(origin=(101.36, 3.831804997, -31.168252024), x_dir=(0, 0, 1), z_dir=(0, 1, 0)) * Cylinder(3.78, 85, mode=Mode.PRIVATE)
    add(fillet1_piece_23, mode=Mode.SUBTRACT)
    with BuildSketch(Plane(origin=(100, 2.5, -26.618252024), x_dir=(-1, 0, 0), z_dir=(0, 0, -1))) as fillet1_piece_24_section:
        with BuildLine():
            CenterArc((FILLET1_R, FILLET1_R), FILLET1_R, 180, 90)
            Line((0, FILLET1_R), (0, 0))
            Line((0, 0), (FILLET1_R, 0))
        make_face()
    fillet1_piece_24 = extrude(amount=46.845, mode=Mode.PRIVATE)
    fillet1_piece_24 = fillet1_piece_24 & Plane(origin=(101.36, 3.831808232, -31.168252024), x_dir=(0, 0, 1), z_dir=(0, 1, 0)) * Cylinder(3.78, 114, mode=Mode.PRIVATE)
    add(fillet1_piece_24, mode=Mode.SUBTRACT)

    # Fillet2
    fillet2_edges = [part.edges().sort_by_distance(p)[0] for p in [
        (0, 88.225, -60.963252024),
        (-100, 88.225, -3.813252024),
        (0, 88.225, 53.336747976),
        (100, 88.225, -3.813252024),
    ]]
    fillet(fillet2_edges, radius=FILLET2_R)


solid = part.part
